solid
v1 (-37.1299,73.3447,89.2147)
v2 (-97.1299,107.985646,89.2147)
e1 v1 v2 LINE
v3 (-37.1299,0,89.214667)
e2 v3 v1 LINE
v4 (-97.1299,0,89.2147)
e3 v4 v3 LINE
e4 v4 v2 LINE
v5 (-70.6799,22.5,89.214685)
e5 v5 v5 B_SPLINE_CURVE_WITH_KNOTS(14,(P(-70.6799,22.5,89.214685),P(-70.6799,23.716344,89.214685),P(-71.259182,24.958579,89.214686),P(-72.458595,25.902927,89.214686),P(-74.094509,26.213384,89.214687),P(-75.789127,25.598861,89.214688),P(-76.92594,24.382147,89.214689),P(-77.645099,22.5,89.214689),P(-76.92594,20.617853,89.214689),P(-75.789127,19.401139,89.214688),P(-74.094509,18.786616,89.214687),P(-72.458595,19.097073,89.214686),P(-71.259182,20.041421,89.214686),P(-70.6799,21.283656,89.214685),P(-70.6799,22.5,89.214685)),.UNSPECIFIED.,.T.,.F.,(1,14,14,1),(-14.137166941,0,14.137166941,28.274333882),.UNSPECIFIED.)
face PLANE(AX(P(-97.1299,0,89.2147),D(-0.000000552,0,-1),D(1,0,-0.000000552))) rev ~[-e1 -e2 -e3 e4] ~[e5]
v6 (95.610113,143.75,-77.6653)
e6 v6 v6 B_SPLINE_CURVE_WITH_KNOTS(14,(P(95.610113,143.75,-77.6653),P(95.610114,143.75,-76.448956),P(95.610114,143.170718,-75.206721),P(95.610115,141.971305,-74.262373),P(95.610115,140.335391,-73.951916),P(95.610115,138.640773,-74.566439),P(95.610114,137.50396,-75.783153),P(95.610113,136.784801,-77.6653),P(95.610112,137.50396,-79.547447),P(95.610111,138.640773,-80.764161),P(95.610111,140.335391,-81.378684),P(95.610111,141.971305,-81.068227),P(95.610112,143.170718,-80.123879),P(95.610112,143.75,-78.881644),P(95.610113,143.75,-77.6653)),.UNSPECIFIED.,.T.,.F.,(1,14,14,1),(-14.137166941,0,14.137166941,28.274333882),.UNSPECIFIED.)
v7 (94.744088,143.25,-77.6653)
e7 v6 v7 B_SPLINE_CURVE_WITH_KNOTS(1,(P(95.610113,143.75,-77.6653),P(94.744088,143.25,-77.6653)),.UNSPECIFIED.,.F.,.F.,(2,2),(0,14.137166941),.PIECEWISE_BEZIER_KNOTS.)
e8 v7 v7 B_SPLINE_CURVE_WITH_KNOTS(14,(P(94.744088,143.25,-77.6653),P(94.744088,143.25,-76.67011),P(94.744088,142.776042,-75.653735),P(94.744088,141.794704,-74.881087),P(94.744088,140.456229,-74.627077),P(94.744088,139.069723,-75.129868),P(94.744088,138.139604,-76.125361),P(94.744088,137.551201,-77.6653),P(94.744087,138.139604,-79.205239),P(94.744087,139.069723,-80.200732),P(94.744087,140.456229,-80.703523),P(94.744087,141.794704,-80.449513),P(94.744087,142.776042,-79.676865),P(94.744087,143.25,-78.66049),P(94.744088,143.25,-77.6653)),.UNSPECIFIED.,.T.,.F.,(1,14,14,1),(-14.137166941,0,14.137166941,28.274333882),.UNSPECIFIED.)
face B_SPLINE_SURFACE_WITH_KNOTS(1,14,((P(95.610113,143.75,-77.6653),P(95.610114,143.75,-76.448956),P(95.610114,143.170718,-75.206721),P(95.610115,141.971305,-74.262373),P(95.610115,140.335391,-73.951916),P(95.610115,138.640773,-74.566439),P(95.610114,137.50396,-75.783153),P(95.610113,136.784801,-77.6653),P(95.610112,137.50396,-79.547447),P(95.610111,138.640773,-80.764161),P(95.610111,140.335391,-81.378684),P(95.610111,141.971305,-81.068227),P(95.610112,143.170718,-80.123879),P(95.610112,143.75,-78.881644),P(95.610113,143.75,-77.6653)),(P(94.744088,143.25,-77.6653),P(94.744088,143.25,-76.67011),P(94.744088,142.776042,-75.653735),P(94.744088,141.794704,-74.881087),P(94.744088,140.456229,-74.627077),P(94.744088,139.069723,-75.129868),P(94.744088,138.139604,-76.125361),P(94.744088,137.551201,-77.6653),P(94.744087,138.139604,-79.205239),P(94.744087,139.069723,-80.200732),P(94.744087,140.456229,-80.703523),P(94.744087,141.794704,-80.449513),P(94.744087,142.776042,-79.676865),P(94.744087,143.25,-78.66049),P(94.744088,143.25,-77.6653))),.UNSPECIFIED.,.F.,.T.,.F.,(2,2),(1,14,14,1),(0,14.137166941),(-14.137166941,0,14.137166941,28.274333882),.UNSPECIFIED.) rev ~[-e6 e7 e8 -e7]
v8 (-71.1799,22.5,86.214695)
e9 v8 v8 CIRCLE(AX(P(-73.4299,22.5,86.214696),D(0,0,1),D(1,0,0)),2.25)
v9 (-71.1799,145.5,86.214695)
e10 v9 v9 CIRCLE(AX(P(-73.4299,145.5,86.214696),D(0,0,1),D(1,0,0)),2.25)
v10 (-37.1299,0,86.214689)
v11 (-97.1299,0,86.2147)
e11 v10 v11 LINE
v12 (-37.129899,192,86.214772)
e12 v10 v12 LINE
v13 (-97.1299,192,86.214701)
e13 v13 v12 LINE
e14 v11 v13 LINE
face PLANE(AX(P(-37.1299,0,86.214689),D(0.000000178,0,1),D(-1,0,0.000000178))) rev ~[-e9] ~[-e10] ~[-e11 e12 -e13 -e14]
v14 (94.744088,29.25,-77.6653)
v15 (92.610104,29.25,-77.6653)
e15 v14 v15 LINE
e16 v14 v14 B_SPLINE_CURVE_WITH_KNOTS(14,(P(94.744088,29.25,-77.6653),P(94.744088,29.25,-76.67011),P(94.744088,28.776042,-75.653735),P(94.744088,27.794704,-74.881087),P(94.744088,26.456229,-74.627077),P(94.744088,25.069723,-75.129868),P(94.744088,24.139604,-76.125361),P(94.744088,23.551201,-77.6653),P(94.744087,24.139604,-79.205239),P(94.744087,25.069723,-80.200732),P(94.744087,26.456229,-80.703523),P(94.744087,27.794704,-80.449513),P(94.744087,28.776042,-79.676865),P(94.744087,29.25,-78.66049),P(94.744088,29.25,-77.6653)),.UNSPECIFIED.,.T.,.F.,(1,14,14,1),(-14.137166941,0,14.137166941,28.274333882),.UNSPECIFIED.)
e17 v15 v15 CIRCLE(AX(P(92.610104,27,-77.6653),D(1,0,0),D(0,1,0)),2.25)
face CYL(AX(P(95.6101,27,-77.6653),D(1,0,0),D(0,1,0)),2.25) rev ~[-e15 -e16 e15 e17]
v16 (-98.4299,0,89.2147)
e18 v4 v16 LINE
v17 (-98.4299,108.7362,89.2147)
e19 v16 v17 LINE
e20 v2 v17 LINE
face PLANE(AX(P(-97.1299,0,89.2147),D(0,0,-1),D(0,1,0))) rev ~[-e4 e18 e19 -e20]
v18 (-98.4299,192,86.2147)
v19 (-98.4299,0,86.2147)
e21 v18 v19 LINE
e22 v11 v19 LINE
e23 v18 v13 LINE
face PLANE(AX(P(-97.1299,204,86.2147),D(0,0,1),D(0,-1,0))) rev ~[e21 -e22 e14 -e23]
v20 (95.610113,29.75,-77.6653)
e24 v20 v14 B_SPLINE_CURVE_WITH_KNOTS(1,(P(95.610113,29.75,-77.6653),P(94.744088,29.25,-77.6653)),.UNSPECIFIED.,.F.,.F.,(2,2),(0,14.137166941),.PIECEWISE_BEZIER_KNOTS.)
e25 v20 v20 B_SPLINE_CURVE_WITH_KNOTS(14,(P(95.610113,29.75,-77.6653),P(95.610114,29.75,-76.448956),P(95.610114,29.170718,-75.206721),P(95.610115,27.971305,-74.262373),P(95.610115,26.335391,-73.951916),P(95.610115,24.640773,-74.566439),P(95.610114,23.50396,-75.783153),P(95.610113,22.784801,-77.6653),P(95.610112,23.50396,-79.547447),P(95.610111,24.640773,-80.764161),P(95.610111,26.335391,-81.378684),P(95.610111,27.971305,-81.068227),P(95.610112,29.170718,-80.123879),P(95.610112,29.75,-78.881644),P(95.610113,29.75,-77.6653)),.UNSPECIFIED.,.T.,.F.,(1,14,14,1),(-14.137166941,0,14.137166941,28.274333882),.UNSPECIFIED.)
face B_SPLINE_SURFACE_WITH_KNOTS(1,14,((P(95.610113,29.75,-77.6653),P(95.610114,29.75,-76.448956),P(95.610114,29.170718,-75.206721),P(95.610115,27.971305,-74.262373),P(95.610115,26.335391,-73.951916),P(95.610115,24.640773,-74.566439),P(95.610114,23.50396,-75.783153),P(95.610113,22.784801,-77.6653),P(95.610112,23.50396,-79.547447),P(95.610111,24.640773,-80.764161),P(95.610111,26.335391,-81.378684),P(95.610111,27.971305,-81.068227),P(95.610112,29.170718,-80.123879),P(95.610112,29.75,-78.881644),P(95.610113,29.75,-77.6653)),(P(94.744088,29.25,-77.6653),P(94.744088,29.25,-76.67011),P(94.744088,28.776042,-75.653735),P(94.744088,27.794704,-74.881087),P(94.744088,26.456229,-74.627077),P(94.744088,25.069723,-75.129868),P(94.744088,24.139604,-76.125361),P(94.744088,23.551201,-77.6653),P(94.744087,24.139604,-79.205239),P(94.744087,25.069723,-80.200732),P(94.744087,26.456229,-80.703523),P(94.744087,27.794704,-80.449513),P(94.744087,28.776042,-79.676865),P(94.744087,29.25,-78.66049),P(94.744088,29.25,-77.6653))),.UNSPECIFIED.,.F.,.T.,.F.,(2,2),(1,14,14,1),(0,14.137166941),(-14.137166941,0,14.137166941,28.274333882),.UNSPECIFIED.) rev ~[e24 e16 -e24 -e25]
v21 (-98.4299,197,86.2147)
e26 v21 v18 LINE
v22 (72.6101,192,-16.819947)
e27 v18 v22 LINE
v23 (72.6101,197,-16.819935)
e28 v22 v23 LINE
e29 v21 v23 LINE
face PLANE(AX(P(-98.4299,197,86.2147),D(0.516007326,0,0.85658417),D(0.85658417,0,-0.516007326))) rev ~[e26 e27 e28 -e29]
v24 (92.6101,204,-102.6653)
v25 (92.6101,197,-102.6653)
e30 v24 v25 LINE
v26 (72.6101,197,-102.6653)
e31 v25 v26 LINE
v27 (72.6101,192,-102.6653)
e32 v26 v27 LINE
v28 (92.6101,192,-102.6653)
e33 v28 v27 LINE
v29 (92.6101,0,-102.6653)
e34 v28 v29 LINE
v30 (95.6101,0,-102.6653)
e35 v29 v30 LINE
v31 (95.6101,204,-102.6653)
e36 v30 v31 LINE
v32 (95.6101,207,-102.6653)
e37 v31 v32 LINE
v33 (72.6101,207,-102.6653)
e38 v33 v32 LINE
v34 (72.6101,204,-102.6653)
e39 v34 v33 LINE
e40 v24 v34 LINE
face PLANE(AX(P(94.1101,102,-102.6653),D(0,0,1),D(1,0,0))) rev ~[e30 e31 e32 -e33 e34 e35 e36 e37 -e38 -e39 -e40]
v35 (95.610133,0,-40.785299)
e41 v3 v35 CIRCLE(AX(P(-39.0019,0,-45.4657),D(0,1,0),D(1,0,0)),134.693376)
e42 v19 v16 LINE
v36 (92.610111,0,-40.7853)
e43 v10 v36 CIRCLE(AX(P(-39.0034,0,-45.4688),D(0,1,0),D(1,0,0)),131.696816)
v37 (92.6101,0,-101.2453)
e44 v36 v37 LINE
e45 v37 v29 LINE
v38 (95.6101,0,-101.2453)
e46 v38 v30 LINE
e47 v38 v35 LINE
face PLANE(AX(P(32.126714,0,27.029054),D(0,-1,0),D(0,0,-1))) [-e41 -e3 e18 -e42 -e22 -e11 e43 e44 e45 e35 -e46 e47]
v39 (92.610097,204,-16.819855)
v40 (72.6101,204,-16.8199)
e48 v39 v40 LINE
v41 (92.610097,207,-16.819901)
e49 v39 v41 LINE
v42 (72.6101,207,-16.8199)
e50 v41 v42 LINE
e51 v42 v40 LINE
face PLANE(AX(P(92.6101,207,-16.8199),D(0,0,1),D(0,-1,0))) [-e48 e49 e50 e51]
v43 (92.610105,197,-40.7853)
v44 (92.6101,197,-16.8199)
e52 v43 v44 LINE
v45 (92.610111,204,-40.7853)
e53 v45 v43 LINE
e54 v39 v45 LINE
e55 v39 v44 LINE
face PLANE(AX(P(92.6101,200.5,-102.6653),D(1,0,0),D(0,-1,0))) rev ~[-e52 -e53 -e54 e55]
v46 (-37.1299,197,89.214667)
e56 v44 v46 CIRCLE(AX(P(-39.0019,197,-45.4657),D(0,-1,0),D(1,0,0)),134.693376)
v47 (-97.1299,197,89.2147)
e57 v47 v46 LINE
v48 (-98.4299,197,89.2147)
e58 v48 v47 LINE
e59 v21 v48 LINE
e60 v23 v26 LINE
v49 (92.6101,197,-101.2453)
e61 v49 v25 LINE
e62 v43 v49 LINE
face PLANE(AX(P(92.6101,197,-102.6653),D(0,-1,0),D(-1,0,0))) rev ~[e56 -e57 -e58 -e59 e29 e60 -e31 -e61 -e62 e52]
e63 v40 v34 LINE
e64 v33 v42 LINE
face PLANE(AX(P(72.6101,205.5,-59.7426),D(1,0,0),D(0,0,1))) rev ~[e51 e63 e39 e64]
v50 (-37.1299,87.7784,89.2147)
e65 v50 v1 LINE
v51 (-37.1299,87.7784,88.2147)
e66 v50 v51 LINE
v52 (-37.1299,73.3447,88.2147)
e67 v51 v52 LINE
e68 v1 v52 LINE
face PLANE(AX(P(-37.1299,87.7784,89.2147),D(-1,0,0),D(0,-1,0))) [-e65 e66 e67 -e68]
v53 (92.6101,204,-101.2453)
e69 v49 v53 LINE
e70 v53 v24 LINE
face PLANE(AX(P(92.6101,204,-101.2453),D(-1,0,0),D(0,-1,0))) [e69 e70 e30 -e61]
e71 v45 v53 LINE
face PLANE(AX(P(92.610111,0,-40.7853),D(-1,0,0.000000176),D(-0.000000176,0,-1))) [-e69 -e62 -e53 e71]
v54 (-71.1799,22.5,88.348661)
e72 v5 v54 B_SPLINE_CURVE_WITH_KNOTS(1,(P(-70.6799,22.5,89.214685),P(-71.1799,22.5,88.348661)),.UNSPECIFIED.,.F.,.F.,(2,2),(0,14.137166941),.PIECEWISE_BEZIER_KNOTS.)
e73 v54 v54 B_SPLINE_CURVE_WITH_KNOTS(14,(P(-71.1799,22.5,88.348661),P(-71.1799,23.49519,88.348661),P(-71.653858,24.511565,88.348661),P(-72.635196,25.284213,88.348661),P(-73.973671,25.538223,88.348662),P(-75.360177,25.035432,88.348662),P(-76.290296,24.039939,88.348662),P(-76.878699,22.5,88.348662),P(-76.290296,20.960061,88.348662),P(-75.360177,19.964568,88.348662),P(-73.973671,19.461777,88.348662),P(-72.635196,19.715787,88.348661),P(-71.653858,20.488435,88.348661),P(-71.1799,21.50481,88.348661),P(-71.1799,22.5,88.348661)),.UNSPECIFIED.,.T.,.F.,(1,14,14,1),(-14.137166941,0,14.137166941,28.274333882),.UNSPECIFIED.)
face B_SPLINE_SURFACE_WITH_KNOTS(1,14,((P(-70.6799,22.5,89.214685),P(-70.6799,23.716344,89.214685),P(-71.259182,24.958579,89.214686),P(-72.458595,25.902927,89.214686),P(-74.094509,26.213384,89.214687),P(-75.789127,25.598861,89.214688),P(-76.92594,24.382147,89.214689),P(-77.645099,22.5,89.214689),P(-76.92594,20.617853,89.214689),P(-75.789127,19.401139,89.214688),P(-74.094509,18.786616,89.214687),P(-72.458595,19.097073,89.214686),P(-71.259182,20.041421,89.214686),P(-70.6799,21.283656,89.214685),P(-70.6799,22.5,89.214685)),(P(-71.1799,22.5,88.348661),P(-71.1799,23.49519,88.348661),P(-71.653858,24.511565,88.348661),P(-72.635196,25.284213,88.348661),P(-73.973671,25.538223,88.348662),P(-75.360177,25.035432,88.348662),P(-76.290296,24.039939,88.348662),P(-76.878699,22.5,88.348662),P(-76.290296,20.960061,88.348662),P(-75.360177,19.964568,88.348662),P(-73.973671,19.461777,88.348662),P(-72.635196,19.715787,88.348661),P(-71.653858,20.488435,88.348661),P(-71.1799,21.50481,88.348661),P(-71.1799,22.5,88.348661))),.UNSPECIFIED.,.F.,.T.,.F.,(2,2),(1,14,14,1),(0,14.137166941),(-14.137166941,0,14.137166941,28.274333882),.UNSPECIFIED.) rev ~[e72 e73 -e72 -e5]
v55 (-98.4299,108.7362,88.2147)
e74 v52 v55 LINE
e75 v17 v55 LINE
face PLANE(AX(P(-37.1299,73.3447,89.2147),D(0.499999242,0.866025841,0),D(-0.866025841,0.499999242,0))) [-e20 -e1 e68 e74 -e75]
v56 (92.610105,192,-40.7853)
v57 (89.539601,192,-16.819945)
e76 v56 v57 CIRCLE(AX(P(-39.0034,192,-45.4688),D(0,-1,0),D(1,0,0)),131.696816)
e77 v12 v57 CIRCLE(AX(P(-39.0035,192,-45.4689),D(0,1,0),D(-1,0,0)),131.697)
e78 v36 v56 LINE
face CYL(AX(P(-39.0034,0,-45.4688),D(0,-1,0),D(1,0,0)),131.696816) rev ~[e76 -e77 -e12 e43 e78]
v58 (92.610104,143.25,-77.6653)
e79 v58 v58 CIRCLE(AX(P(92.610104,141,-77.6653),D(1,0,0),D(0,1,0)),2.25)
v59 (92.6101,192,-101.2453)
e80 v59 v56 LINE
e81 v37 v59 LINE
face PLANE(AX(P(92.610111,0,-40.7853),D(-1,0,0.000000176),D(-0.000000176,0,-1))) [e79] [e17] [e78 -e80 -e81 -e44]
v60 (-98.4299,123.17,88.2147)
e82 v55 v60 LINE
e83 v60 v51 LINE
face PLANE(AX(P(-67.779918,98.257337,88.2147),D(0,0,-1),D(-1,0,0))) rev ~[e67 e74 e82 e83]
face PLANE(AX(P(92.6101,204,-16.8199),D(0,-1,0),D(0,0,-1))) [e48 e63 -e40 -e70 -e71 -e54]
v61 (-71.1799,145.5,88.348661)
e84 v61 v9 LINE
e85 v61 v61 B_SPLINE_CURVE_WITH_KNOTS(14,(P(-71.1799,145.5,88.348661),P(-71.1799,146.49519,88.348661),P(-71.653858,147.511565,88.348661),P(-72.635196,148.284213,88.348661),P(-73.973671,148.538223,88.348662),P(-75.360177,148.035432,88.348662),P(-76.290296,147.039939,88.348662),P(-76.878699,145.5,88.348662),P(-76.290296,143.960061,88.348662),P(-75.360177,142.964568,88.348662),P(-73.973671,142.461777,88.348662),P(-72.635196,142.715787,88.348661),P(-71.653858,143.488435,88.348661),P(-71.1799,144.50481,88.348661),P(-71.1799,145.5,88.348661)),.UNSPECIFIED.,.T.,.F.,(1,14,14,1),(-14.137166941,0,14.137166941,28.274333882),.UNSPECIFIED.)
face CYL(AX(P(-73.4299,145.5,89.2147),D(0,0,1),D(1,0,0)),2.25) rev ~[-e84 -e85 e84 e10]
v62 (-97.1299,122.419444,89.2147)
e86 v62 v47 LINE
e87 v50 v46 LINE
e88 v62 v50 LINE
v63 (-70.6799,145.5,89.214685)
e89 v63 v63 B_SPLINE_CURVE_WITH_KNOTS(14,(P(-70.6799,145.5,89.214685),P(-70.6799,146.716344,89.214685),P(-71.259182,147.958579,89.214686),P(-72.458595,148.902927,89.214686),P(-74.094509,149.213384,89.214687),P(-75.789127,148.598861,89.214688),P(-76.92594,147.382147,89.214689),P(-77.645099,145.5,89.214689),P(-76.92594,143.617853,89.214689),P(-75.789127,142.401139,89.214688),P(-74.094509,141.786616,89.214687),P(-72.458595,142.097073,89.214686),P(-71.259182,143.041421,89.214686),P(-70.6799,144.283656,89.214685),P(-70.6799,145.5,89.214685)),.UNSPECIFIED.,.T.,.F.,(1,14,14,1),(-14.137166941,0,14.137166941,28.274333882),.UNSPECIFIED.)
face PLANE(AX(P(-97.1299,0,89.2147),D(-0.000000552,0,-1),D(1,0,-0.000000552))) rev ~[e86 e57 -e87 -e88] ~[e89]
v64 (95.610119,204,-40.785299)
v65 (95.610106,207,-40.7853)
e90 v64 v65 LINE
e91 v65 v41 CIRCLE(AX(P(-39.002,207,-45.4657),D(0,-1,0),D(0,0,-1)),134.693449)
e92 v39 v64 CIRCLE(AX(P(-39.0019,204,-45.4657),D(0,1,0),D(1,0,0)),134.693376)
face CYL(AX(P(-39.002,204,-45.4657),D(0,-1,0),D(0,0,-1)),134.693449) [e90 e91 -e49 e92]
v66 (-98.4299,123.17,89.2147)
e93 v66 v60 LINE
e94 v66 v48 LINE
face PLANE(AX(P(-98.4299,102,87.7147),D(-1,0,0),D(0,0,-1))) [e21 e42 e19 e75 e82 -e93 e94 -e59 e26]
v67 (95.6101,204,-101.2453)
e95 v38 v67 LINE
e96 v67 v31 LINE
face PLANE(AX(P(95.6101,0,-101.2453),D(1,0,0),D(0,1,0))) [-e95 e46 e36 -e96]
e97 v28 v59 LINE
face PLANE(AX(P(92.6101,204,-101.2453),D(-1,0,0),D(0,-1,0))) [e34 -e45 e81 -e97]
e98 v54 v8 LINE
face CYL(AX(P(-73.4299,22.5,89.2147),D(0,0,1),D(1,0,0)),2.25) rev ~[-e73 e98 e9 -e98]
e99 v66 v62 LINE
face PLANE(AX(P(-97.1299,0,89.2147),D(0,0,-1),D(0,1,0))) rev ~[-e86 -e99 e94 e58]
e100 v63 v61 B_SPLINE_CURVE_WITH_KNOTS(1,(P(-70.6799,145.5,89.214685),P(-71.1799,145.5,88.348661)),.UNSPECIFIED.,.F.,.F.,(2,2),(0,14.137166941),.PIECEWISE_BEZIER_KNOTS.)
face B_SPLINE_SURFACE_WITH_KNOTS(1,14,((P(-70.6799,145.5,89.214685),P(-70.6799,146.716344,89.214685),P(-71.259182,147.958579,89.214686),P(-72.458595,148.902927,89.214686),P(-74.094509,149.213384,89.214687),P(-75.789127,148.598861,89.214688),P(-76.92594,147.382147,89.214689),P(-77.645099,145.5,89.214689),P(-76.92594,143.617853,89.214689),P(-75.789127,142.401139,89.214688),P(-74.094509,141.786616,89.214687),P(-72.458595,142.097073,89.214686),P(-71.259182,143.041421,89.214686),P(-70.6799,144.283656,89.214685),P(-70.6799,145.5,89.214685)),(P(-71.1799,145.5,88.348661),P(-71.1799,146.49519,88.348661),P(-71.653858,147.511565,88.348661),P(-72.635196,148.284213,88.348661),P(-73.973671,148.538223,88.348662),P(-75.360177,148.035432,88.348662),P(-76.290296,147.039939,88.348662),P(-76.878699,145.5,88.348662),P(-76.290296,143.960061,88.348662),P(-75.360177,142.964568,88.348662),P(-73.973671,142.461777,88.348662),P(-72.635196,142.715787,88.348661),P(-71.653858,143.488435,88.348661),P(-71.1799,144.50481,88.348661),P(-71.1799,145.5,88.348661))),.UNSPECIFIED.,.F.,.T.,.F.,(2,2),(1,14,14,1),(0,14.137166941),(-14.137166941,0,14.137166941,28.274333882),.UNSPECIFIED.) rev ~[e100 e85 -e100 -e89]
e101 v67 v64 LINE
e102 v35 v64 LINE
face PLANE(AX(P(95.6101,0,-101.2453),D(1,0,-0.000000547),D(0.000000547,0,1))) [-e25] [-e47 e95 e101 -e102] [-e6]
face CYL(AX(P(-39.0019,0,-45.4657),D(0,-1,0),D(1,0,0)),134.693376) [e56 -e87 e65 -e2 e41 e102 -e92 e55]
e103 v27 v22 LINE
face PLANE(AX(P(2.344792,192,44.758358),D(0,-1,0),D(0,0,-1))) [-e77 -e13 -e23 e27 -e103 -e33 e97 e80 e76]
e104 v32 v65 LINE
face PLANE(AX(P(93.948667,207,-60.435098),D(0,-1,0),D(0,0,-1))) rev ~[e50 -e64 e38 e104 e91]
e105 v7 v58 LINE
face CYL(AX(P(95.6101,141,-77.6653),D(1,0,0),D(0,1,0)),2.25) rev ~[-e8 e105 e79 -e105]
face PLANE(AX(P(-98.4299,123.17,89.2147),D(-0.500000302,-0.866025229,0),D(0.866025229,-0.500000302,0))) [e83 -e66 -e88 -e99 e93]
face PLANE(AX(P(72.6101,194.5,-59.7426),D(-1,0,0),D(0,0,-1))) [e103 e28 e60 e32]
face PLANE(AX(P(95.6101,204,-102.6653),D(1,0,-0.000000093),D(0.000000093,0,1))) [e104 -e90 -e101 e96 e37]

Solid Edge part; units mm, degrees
sketch "Sketch1" plane through (0, 0, 0) normal (0, -1, 0) x (1, 0, 0)
  arc A0 (-37.1299, 86.2147) -> (92.6101, -40.7853) centre (-39.0034, -45.4688) cw
  line L0 (92.6101, -40.7853) -> (92.6101, -101.2453)
  line L1 (92.6101, -101.2453) -> (95.6101, -101.2453)
  line L2 (95.6101, -101.2453) -> (95.6101, -40.7853)
  arc A1 (-37.1299, 89.2147) -> (95.6101, -40.7853) centre (-39.0019, -45.4657) cw
  line L3 (-97.1299, 89.2147) -> (-37.1299, 89.2147)
  line L4 (-97.1299, 86.2147) -> (-97.1299, 89.2147)
  line L5 (-37.1299, 86.2147) -> (-97.1299, 86.2147)
  dimension "D1" = 129.74
  dimension "D2" = 127
  dimension "D3" = 60
  dimension "D4" = 60.46
  dimension "D5" = 3
  dimension "D6" = 3
  dimension "D7" = 3
extrude "Protrusion1" add sketch "Sketch1" against normal blind 204
sketch "Sketch2" plane through (-67.1299, 85, 89.2147) normal (0, 0, 1) x (1, 0, 0)
  circle A0 centre (-6.3, -62.5) radius 2.25
  circle A1 centre (-6.3, 60.5) radius 2.25
  dimension "D1" = 23.7
  dimension "D2" = 4.5
  dimension "D3" = 123
  dimension "D4" = 22.5
extrude "Cutout1" cut sketch "Sketch2" against normal through all
sketch "Sketch3" plane through (95.6101, 85, -66.0153) normal (1, 0, 0) x (0, 1, 0)
  circle A0 centre (56, -11.65) radius 2.25
  circle A1 centre (-58, -11.65) radius 2.25
  dimension "D1" = 114
  dimension "D2" = 4.5
  dimension "D3" = 4.5
  dimension "D4" = 23.58
  dimension "D5" = 75
extrude "Cutout2" cut sketch "Sketch3" against normal through all
sketch "Sketch4" plane through (-97.1299, 102, 87.7147) normal (-1, 0, 0) x (0, -1, 0)
  line L0 (-102, -1.5) -> (102, -1.5)
  line L1 (102, -1.5) -> (102, 1.5)
  line L2 (102, 1.5) -> (-102, 1.5)
  line L3 (-102, 1.5) -> (-102, -1.5)
extrude "Extrusionsausprägung_3" add sketch "Sketch4" along normal blind 1.3
sketch "Sketch5" plane through (94.1101, 102, -101.2453) normal (0, 0, -1) x (0, 1, 0)
  line L0 (-102, 1.5) -> (102, 1.5)
  line L1 (102, 1.5) -> (102, -1.5)
  line L2 (102, -1.5) -> (-102, -1.5)
  line L3 (-102, -1.5) -> (-102, 1.5)
extrude "Extrusionsausprägung_4" add sketch "Sketch5" along normal blind 1.42
sketch "Sketch6" plane through (-67.7799, 102, 89.2147) normal (0, 0, 1) x (0, 1, 0)
  line L0 (21.17, 30.65) -> (-14.2216, -30.65)
  line L1 (-14.2216, -30.65) -> (-28.6553, -30.65)
  line L2 (-28.6553, -30.65) -> (6.7362, 30.65)
  line L3 (6.7362, 30.65) -> (21.17, 30.65)
  dimension "D1" = 12.5
  dimension "D2" = 80.83
extrude "Cutout3" cut sketch "Sketch6" against normal blind 1
chamfer "Fase_1" distance 0.5 angle 60 4 edges at (-75.6799, 22.5, 89.2147) (-75.6799, 145.5, 89.2147) (95.6101, 24.75, -77.6653) (95.6101, 138.75, -77.6653) measured on face at (-87.7299, 88.9082, 89.2147) measured on face at (-87.7299, 183.4675, 89.2147) measured on face at (-87.7299, 88.9082, 89.2147) measured on face at (-87.7299, 183.4675, 89.2147) measured on face at (95.6101, 167.96, -91.7732)
sketch "Sketch7" plane through (-67.7799, 145.8892, 89.2147) normal (0, 0, 1) x (-1, 0, 0)
  line L0 (30.65, -58.1108) -> (-160.39, -58.1108)
  line L1 (-160.39, -58.1108) -> (-160.39, -53.1108)
  line L2 (-160.39, -53.1108) -> (30.65, -53.1108)
  line L3 (30.65, -53.1108) -> (30.65, -58.1108)
  dimension "D1" = 5
  dimension "D2" = 191.04
extrude "Cutout4" cut sketch "Sketch7" against normal up to next
sketch "Sketch8" plane through (94.1101, 204, -59.7426) normal (0, 1, 0) x (0, 0, -1)
  line L0 (-42.9227, 1.5) -> (42.9227, 1.5)
  line L1 (42.9227, 1.5) -> (42.9227, -1.5)
  line L2 (42.9227, -1.5) -> (-18.9573, -1.5)
  arc A0 (-18.9573, -1.5) -> (-42.9227, 1.5) centre (-14.2769, 133.1121) cw
extrude "Extrusionsausprägung_7" add sketch "Sketch8" along normal blind 3
sketch "Sketch9" plane through (92.6101, 103.5, -59.7426) normal (-1, 0, 0) x (0, -1, 0)
  line L0 (-88.5, 42.9227) -> (-93.5, 42.9227)
  line L1 (-93.5, 42.9227) -> (-93.5, -42.9227)
  line L2 (-93.5, -42.9227) -> (-88.5, -42.9227)
  line L3 (-88.5, -42.9227) -> (-88.5, 42.9227)
  line L4 (-103.5, 42.9227) -> (-100.5, 42.9227)
  line L5 (-100.5, 42.9227) -> (-100.5, -42.9227)
  line L6 (-100.5, -42.9227) -> (-103.5, -42.9227)
  line L7 (-103.5, -42.9227) -> (-103.5, 42.9227)
  dimension "D1" = 3
  dimension "D2" = 5
  dimension "D3" = 7
  dimension "D4" = 85.8453
extrude "Extrusionsausprägung_8" add sketch "Sketch9" along normal blind 20
sketch "Sketch10" plane through (84.1101, 103.5, -102.6653) normal (0, 0, -1) x (0, 1, 0)
  line L0 (93.5, 8.5) -> (93.5, -182.54)
  line L1 (93.5, -182.54) -> (97, -182.54)
  line L2 (97, -182.54) -> (97, 8.5)
  line L3 (97, 8.5) -> (93.5, 8.5)
extrude "Cutout5" cut sketch "Sketch10" against normal up to next
sketch "Sketch11" plane through (-2.9099, 197, -6.7253) normal (0, 1, 0) x (-1, 0, 0)
  line L0 (95.52, 92.94) -> (-75.52, -10.0947)
  line L1 (-92.4495, -10.0947) -> (-75.52, -10.0947)
  arc A0 (34.22, 92.94) -> (-92.4495, -10.0947) centre (36.0936, -38.7436) ccw
  line L2 (95.52, 92.94) -> (34.22, 92.94)
extrude "Protrusion2" add sketch "Sketch11" against normal up to vertex (5 mm away)
properties part number "C2.2-A" material "Nylon, allgemein"
